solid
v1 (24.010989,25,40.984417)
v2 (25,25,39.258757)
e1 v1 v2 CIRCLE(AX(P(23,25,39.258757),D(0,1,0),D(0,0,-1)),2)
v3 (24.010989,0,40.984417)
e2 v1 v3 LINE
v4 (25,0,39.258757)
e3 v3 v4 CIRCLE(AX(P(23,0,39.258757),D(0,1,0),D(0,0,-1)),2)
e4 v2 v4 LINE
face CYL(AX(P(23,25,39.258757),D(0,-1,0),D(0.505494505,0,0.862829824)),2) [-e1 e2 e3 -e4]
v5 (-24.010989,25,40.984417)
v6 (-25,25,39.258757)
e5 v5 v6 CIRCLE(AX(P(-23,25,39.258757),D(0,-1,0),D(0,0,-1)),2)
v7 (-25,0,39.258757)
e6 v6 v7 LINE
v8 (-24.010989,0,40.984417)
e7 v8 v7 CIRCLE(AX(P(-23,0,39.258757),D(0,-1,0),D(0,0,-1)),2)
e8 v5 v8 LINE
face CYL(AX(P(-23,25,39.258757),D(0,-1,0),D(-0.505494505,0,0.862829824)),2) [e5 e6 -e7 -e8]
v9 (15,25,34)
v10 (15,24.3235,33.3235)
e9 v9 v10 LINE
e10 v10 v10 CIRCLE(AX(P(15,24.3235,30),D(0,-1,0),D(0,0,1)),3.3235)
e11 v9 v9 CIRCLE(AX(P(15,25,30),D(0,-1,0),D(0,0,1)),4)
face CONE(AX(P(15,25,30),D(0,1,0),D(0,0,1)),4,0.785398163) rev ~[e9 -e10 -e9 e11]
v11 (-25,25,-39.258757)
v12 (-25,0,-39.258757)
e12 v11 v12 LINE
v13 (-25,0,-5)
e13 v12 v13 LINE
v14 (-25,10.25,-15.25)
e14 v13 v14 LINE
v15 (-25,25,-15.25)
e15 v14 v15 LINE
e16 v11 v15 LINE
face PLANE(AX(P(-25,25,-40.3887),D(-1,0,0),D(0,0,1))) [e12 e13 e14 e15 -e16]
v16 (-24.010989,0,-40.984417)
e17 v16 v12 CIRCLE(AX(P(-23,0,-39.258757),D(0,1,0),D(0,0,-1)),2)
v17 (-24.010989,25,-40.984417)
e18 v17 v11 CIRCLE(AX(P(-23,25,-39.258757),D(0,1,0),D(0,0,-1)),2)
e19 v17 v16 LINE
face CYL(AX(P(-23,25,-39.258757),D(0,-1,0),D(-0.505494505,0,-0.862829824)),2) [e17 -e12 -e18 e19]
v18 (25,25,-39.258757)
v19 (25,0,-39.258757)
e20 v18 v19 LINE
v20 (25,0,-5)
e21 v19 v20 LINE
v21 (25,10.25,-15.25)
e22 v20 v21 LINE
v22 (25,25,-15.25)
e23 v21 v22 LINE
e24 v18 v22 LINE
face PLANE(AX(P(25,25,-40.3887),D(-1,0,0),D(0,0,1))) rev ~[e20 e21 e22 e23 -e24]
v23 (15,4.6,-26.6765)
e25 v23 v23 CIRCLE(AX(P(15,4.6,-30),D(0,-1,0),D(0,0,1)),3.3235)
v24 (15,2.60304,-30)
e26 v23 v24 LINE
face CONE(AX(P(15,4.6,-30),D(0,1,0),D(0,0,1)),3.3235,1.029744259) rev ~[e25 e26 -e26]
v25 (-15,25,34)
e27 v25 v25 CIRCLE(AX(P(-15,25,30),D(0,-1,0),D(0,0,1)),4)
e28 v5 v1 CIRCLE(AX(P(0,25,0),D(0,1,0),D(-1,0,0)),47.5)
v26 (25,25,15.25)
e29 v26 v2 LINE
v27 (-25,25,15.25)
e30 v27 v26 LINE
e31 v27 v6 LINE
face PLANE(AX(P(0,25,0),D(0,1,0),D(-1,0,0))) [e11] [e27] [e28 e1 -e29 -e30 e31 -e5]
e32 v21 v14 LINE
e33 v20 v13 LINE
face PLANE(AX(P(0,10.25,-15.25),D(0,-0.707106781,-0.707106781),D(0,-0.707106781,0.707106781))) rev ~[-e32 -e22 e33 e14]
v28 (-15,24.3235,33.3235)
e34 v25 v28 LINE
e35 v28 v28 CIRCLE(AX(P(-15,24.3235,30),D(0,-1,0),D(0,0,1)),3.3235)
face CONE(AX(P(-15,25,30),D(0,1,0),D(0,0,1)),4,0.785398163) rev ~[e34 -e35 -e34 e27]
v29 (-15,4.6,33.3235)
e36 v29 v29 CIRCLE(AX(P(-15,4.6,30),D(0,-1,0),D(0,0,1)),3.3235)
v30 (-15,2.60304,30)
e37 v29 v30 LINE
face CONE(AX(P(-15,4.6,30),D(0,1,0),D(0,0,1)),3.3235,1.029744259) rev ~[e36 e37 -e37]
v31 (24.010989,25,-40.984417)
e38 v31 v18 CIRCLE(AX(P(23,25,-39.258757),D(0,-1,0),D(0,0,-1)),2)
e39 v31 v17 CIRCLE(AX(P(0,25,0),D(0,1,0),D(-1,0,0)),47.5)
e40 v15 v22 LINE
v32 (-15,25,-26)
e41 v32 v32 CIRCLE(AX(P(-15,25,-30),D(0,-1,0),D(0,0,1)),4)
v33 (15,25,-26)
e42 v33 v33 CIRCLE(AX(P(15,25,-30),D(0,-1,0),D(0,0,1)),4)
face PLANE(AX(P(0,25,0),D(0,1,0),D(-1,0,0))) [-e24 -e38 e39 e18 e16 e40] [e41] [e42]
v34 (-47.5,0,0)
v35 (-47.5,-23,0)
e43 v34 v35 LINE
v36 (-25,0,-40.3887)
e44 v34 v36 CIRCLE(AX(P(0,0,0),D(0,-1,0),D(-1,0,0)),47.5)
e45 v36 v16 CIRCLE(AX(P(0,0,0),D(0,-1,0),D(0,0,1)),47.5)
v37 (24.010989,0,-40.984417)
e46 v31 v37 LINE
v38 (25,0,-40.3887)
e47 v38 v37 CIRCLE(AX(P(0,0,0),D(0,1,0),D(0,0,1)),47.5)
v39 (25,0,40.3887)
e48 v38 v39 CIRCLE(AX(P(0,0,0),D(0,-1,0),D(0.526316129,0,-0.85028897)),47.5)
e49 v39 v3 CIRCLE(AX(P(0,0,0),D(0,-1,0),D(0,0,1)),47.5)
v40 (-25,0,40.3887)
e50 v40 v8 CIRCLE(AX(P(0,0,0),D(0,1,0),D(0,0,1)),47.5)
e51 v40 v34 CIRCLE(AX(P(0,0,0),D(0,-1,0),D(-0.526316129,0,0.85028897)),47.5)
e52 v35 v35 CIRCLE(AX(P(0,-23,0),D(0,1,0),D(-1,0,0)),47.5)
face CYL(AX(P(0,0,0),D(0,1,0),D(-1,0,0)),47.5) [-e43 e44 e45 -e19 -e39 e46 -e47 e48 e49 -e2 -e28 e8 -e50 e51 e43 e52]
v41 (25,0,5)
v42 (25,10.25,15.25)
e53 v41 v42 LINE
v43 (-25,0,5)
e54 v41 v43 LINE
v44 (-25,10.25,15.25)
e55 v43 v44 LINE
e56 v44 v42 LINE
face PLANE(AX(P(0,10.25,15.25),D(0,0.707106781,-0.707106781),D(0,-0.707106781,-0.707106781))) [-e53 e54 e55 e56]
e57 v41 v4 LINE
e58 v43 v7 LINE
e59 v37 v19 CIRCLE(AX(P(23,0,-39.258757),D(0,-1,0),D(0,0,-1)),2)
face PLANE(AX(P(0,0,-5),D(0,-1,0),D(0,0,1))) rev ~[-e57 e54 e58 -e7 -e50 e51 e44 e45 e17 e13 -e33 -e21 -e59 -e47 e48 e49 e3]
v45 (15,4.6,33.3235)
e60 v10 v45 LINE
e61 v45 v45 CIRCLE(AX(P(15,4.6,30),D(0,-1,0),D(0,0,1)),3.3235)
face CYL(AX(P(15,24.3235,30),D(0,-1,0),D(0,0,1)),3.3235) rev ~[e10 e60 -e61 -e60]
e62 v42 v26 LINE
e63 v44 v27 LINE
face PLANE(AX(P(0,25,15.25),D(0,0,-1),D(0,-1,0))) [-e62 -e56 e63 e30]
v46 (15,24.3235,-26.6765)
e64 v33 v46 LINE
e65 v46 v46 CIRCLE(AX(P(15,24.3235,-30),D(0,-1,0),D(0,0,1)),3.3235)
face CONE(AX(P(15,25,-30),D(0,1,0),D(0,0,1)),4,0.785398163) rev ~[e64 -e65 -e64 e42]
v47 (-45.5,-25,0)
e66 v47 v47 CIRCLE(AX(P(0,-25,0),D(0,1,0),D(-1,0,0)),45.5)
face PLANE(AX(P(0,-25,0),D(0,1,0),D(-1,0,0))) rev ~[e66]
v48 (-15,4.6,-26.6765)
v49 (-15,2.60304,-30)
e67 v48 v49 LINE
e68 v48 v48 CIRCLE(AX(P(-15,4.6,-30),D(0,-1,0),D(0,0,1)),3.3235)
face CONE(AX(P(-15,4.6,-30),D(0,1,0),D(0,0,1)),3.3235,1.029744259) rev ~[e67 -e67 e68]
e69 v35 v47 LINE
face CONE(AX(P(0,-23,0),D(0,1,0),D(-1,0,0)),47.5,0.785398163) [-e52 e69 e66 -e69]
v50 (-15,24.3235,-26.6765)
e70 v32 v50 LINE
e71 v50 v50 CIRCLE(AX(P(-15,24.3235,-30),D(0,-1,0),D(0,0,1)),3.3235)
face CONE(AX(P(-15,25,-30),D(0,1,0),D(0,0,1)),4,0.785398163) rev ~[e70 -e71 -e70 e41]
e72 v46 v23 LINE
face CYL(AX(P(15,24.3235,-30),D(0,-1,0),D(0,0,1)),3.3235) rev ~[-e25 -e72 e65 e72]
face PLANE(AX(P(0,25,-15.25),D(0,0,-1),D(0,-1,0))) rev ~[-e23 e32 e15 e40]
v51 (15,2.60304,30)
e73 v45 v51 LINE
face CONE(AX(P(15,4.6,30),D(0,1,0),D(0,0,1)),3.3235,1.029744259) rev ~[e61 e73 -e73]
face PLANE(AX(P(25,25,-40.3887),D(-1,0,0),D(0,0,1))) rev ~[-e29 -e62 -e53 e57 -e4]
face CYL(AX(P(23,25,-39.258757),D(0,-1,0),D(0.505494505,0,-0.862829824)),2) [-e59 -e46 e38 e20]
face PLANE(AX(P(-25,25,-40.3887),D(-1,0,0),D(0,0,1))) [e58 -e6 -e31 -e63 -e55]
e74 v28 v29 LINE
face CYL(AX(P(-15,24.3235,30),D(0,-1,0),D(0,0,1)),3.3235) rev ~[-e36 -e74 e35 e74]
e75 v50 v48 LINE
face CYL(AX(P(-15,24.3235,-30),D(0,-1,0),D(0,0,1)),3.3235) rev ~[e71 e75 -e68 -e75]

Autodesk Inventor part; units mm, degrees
ref_plane "YZ Plane" through (0, 0, 0) normal (1, 0, 0) x (0, 1, 0)
ref_plane "XZ Plane" through (0, 0, 0) normal (0, 1, 0) x (-1, 0, 0)
ref_plane "XY Plane" through (0, 0, 0) normal (0, 0, 1) x (1, 0, 0)
sketch "Sketch1" plane through (0, 0, 0) normal (0, 1, 0) x (-1, 0, 0)
  circle A0 centre (0, 0) radius 47.5
  dimension "d0" = 95
extrude "Extrusion1" add sketch "Sketch1" along normal mid plane 50
sketch "Sketch4" plane through (0, 0, 0) normal (1, 0, 0) x (0, 1, 0)
  line L0 (-25, 47.5) -> (-25, -47.5) projected
  line L1 (25, -47.5) -> (25, 47.5) projected
  line L2 (-42, 0) -> (42, 0) projected
  line L3 (25, 15.25) -> (10.25, 15.25)
  line L4 (10.25, 15.25) -> (0, 5)
  line L5 (0, 5) -> (0, 0)
  line L6 (25, -15.25) -> (10.25, -15.25)
  line L7 (10.25, -15.25) -> (0, -5)
  line L8 (0, -5) -> (0, 0)
  dimension "d22" = 30.5
  dimension "d23" = 45
  dimension "d24" = 10
  dimension "d25" = 25
extrude "Extrusion3" cut sketch "Sketch4" along normal through all both and the other way through all
sketch "Sketch5" plane through (0, 25, 0) normal (0, 1, 0) x (1, 0, 0)
  line L0 (-66.5, 0) -> (66.5, 0) construction
  line L1 (0, 66.5) -> (0, -66.5) construction
  arc A0 (44.9854, 15.25) -> (-44.9854, 15.25) centre (0, 0) ccw construction
  line L2 (-47.5, 40.3887) -> (-25, 40.3887)
  line L3 (-25, 40.3887) -> (-25, -40.3887)
  line L4 (-25, -40.3887) -> (-47.5, -40.3887)
  line L5 (-47.5, -40.3887) -> (-47.5, 40.3887)
  arc A1 (-47.2361, 5) -> (-47.2361, -5) centre (0, 0) ccw projected
  line L6 (47.5, 40.3887) -> (25, 40.3887)
  line L7 (25, 40.3887) -> (25, -40.3887)
  line L8 (25, -40.3887) -> (47.5, -40.3887)
  line L9 (47.5, -40.3887) -> (47.5, 40.3887)
  arc A2 (47.2361, -5) -> (47.2361, 5) centre (0, 0) ccw
  dimension "d28" = 50
extrude "Extrusion4" cut sketch "Sketch5" against normal up to surface (25 mm away)
sketch "Sketch6" plane through (0, 25, 0) normal (0, 1, 0) x (1, 0, 0)
  line L0 (15, -30) -> (-15, -30) construction
  line L1 (-15, -30) -> (-15, 30) construction
  line L2 (-15, 30) -> (15, 30) construction
  line L3 (15, 30) -> (15, -30) construction
  line L4 (15, -30) -> (-15, 30) construction
  line L5 (-15, -30) -> (15, 30) construction
  point P0 (0, 0)
  dimension "d31" = 30
  dimension "d32" = 60
hole "Hole2" at (-15, 25, -30) at (15, 25, -30) at (-15, 25, 30) at (15, 25, 30) direction (0, -1, 0) diameter 6.647 depth 20.4 tip angle 118 countersink diameter 8 countersink angle 90 thread size "M8x1.25" class "6H" standard "ISO Metric profile"
fillet "Fillet1" radius 2 4 edges at (-25, 12.5, -40.3887) (-25, 12.5, 40.3887) (25, 12.5, -40.3887) (25, 12.5, 40.3887)
chamfer "Chamfer3" distance 2 angle 45 1 edges at (47.5, -25, 0)
sketch "Sketch7" plane through (0, -25, 0) normal (0, -1, 0) x (1, 0, 0)
  circle A0 centre (0, 0) radius 15 construction
  circle A1 centre (0, 0) radius 19 construction
  dimension "d44" = 4
  dimension "d45" = 30
mark "Mark1"
properties part number "HM1_FIXT2-001"
